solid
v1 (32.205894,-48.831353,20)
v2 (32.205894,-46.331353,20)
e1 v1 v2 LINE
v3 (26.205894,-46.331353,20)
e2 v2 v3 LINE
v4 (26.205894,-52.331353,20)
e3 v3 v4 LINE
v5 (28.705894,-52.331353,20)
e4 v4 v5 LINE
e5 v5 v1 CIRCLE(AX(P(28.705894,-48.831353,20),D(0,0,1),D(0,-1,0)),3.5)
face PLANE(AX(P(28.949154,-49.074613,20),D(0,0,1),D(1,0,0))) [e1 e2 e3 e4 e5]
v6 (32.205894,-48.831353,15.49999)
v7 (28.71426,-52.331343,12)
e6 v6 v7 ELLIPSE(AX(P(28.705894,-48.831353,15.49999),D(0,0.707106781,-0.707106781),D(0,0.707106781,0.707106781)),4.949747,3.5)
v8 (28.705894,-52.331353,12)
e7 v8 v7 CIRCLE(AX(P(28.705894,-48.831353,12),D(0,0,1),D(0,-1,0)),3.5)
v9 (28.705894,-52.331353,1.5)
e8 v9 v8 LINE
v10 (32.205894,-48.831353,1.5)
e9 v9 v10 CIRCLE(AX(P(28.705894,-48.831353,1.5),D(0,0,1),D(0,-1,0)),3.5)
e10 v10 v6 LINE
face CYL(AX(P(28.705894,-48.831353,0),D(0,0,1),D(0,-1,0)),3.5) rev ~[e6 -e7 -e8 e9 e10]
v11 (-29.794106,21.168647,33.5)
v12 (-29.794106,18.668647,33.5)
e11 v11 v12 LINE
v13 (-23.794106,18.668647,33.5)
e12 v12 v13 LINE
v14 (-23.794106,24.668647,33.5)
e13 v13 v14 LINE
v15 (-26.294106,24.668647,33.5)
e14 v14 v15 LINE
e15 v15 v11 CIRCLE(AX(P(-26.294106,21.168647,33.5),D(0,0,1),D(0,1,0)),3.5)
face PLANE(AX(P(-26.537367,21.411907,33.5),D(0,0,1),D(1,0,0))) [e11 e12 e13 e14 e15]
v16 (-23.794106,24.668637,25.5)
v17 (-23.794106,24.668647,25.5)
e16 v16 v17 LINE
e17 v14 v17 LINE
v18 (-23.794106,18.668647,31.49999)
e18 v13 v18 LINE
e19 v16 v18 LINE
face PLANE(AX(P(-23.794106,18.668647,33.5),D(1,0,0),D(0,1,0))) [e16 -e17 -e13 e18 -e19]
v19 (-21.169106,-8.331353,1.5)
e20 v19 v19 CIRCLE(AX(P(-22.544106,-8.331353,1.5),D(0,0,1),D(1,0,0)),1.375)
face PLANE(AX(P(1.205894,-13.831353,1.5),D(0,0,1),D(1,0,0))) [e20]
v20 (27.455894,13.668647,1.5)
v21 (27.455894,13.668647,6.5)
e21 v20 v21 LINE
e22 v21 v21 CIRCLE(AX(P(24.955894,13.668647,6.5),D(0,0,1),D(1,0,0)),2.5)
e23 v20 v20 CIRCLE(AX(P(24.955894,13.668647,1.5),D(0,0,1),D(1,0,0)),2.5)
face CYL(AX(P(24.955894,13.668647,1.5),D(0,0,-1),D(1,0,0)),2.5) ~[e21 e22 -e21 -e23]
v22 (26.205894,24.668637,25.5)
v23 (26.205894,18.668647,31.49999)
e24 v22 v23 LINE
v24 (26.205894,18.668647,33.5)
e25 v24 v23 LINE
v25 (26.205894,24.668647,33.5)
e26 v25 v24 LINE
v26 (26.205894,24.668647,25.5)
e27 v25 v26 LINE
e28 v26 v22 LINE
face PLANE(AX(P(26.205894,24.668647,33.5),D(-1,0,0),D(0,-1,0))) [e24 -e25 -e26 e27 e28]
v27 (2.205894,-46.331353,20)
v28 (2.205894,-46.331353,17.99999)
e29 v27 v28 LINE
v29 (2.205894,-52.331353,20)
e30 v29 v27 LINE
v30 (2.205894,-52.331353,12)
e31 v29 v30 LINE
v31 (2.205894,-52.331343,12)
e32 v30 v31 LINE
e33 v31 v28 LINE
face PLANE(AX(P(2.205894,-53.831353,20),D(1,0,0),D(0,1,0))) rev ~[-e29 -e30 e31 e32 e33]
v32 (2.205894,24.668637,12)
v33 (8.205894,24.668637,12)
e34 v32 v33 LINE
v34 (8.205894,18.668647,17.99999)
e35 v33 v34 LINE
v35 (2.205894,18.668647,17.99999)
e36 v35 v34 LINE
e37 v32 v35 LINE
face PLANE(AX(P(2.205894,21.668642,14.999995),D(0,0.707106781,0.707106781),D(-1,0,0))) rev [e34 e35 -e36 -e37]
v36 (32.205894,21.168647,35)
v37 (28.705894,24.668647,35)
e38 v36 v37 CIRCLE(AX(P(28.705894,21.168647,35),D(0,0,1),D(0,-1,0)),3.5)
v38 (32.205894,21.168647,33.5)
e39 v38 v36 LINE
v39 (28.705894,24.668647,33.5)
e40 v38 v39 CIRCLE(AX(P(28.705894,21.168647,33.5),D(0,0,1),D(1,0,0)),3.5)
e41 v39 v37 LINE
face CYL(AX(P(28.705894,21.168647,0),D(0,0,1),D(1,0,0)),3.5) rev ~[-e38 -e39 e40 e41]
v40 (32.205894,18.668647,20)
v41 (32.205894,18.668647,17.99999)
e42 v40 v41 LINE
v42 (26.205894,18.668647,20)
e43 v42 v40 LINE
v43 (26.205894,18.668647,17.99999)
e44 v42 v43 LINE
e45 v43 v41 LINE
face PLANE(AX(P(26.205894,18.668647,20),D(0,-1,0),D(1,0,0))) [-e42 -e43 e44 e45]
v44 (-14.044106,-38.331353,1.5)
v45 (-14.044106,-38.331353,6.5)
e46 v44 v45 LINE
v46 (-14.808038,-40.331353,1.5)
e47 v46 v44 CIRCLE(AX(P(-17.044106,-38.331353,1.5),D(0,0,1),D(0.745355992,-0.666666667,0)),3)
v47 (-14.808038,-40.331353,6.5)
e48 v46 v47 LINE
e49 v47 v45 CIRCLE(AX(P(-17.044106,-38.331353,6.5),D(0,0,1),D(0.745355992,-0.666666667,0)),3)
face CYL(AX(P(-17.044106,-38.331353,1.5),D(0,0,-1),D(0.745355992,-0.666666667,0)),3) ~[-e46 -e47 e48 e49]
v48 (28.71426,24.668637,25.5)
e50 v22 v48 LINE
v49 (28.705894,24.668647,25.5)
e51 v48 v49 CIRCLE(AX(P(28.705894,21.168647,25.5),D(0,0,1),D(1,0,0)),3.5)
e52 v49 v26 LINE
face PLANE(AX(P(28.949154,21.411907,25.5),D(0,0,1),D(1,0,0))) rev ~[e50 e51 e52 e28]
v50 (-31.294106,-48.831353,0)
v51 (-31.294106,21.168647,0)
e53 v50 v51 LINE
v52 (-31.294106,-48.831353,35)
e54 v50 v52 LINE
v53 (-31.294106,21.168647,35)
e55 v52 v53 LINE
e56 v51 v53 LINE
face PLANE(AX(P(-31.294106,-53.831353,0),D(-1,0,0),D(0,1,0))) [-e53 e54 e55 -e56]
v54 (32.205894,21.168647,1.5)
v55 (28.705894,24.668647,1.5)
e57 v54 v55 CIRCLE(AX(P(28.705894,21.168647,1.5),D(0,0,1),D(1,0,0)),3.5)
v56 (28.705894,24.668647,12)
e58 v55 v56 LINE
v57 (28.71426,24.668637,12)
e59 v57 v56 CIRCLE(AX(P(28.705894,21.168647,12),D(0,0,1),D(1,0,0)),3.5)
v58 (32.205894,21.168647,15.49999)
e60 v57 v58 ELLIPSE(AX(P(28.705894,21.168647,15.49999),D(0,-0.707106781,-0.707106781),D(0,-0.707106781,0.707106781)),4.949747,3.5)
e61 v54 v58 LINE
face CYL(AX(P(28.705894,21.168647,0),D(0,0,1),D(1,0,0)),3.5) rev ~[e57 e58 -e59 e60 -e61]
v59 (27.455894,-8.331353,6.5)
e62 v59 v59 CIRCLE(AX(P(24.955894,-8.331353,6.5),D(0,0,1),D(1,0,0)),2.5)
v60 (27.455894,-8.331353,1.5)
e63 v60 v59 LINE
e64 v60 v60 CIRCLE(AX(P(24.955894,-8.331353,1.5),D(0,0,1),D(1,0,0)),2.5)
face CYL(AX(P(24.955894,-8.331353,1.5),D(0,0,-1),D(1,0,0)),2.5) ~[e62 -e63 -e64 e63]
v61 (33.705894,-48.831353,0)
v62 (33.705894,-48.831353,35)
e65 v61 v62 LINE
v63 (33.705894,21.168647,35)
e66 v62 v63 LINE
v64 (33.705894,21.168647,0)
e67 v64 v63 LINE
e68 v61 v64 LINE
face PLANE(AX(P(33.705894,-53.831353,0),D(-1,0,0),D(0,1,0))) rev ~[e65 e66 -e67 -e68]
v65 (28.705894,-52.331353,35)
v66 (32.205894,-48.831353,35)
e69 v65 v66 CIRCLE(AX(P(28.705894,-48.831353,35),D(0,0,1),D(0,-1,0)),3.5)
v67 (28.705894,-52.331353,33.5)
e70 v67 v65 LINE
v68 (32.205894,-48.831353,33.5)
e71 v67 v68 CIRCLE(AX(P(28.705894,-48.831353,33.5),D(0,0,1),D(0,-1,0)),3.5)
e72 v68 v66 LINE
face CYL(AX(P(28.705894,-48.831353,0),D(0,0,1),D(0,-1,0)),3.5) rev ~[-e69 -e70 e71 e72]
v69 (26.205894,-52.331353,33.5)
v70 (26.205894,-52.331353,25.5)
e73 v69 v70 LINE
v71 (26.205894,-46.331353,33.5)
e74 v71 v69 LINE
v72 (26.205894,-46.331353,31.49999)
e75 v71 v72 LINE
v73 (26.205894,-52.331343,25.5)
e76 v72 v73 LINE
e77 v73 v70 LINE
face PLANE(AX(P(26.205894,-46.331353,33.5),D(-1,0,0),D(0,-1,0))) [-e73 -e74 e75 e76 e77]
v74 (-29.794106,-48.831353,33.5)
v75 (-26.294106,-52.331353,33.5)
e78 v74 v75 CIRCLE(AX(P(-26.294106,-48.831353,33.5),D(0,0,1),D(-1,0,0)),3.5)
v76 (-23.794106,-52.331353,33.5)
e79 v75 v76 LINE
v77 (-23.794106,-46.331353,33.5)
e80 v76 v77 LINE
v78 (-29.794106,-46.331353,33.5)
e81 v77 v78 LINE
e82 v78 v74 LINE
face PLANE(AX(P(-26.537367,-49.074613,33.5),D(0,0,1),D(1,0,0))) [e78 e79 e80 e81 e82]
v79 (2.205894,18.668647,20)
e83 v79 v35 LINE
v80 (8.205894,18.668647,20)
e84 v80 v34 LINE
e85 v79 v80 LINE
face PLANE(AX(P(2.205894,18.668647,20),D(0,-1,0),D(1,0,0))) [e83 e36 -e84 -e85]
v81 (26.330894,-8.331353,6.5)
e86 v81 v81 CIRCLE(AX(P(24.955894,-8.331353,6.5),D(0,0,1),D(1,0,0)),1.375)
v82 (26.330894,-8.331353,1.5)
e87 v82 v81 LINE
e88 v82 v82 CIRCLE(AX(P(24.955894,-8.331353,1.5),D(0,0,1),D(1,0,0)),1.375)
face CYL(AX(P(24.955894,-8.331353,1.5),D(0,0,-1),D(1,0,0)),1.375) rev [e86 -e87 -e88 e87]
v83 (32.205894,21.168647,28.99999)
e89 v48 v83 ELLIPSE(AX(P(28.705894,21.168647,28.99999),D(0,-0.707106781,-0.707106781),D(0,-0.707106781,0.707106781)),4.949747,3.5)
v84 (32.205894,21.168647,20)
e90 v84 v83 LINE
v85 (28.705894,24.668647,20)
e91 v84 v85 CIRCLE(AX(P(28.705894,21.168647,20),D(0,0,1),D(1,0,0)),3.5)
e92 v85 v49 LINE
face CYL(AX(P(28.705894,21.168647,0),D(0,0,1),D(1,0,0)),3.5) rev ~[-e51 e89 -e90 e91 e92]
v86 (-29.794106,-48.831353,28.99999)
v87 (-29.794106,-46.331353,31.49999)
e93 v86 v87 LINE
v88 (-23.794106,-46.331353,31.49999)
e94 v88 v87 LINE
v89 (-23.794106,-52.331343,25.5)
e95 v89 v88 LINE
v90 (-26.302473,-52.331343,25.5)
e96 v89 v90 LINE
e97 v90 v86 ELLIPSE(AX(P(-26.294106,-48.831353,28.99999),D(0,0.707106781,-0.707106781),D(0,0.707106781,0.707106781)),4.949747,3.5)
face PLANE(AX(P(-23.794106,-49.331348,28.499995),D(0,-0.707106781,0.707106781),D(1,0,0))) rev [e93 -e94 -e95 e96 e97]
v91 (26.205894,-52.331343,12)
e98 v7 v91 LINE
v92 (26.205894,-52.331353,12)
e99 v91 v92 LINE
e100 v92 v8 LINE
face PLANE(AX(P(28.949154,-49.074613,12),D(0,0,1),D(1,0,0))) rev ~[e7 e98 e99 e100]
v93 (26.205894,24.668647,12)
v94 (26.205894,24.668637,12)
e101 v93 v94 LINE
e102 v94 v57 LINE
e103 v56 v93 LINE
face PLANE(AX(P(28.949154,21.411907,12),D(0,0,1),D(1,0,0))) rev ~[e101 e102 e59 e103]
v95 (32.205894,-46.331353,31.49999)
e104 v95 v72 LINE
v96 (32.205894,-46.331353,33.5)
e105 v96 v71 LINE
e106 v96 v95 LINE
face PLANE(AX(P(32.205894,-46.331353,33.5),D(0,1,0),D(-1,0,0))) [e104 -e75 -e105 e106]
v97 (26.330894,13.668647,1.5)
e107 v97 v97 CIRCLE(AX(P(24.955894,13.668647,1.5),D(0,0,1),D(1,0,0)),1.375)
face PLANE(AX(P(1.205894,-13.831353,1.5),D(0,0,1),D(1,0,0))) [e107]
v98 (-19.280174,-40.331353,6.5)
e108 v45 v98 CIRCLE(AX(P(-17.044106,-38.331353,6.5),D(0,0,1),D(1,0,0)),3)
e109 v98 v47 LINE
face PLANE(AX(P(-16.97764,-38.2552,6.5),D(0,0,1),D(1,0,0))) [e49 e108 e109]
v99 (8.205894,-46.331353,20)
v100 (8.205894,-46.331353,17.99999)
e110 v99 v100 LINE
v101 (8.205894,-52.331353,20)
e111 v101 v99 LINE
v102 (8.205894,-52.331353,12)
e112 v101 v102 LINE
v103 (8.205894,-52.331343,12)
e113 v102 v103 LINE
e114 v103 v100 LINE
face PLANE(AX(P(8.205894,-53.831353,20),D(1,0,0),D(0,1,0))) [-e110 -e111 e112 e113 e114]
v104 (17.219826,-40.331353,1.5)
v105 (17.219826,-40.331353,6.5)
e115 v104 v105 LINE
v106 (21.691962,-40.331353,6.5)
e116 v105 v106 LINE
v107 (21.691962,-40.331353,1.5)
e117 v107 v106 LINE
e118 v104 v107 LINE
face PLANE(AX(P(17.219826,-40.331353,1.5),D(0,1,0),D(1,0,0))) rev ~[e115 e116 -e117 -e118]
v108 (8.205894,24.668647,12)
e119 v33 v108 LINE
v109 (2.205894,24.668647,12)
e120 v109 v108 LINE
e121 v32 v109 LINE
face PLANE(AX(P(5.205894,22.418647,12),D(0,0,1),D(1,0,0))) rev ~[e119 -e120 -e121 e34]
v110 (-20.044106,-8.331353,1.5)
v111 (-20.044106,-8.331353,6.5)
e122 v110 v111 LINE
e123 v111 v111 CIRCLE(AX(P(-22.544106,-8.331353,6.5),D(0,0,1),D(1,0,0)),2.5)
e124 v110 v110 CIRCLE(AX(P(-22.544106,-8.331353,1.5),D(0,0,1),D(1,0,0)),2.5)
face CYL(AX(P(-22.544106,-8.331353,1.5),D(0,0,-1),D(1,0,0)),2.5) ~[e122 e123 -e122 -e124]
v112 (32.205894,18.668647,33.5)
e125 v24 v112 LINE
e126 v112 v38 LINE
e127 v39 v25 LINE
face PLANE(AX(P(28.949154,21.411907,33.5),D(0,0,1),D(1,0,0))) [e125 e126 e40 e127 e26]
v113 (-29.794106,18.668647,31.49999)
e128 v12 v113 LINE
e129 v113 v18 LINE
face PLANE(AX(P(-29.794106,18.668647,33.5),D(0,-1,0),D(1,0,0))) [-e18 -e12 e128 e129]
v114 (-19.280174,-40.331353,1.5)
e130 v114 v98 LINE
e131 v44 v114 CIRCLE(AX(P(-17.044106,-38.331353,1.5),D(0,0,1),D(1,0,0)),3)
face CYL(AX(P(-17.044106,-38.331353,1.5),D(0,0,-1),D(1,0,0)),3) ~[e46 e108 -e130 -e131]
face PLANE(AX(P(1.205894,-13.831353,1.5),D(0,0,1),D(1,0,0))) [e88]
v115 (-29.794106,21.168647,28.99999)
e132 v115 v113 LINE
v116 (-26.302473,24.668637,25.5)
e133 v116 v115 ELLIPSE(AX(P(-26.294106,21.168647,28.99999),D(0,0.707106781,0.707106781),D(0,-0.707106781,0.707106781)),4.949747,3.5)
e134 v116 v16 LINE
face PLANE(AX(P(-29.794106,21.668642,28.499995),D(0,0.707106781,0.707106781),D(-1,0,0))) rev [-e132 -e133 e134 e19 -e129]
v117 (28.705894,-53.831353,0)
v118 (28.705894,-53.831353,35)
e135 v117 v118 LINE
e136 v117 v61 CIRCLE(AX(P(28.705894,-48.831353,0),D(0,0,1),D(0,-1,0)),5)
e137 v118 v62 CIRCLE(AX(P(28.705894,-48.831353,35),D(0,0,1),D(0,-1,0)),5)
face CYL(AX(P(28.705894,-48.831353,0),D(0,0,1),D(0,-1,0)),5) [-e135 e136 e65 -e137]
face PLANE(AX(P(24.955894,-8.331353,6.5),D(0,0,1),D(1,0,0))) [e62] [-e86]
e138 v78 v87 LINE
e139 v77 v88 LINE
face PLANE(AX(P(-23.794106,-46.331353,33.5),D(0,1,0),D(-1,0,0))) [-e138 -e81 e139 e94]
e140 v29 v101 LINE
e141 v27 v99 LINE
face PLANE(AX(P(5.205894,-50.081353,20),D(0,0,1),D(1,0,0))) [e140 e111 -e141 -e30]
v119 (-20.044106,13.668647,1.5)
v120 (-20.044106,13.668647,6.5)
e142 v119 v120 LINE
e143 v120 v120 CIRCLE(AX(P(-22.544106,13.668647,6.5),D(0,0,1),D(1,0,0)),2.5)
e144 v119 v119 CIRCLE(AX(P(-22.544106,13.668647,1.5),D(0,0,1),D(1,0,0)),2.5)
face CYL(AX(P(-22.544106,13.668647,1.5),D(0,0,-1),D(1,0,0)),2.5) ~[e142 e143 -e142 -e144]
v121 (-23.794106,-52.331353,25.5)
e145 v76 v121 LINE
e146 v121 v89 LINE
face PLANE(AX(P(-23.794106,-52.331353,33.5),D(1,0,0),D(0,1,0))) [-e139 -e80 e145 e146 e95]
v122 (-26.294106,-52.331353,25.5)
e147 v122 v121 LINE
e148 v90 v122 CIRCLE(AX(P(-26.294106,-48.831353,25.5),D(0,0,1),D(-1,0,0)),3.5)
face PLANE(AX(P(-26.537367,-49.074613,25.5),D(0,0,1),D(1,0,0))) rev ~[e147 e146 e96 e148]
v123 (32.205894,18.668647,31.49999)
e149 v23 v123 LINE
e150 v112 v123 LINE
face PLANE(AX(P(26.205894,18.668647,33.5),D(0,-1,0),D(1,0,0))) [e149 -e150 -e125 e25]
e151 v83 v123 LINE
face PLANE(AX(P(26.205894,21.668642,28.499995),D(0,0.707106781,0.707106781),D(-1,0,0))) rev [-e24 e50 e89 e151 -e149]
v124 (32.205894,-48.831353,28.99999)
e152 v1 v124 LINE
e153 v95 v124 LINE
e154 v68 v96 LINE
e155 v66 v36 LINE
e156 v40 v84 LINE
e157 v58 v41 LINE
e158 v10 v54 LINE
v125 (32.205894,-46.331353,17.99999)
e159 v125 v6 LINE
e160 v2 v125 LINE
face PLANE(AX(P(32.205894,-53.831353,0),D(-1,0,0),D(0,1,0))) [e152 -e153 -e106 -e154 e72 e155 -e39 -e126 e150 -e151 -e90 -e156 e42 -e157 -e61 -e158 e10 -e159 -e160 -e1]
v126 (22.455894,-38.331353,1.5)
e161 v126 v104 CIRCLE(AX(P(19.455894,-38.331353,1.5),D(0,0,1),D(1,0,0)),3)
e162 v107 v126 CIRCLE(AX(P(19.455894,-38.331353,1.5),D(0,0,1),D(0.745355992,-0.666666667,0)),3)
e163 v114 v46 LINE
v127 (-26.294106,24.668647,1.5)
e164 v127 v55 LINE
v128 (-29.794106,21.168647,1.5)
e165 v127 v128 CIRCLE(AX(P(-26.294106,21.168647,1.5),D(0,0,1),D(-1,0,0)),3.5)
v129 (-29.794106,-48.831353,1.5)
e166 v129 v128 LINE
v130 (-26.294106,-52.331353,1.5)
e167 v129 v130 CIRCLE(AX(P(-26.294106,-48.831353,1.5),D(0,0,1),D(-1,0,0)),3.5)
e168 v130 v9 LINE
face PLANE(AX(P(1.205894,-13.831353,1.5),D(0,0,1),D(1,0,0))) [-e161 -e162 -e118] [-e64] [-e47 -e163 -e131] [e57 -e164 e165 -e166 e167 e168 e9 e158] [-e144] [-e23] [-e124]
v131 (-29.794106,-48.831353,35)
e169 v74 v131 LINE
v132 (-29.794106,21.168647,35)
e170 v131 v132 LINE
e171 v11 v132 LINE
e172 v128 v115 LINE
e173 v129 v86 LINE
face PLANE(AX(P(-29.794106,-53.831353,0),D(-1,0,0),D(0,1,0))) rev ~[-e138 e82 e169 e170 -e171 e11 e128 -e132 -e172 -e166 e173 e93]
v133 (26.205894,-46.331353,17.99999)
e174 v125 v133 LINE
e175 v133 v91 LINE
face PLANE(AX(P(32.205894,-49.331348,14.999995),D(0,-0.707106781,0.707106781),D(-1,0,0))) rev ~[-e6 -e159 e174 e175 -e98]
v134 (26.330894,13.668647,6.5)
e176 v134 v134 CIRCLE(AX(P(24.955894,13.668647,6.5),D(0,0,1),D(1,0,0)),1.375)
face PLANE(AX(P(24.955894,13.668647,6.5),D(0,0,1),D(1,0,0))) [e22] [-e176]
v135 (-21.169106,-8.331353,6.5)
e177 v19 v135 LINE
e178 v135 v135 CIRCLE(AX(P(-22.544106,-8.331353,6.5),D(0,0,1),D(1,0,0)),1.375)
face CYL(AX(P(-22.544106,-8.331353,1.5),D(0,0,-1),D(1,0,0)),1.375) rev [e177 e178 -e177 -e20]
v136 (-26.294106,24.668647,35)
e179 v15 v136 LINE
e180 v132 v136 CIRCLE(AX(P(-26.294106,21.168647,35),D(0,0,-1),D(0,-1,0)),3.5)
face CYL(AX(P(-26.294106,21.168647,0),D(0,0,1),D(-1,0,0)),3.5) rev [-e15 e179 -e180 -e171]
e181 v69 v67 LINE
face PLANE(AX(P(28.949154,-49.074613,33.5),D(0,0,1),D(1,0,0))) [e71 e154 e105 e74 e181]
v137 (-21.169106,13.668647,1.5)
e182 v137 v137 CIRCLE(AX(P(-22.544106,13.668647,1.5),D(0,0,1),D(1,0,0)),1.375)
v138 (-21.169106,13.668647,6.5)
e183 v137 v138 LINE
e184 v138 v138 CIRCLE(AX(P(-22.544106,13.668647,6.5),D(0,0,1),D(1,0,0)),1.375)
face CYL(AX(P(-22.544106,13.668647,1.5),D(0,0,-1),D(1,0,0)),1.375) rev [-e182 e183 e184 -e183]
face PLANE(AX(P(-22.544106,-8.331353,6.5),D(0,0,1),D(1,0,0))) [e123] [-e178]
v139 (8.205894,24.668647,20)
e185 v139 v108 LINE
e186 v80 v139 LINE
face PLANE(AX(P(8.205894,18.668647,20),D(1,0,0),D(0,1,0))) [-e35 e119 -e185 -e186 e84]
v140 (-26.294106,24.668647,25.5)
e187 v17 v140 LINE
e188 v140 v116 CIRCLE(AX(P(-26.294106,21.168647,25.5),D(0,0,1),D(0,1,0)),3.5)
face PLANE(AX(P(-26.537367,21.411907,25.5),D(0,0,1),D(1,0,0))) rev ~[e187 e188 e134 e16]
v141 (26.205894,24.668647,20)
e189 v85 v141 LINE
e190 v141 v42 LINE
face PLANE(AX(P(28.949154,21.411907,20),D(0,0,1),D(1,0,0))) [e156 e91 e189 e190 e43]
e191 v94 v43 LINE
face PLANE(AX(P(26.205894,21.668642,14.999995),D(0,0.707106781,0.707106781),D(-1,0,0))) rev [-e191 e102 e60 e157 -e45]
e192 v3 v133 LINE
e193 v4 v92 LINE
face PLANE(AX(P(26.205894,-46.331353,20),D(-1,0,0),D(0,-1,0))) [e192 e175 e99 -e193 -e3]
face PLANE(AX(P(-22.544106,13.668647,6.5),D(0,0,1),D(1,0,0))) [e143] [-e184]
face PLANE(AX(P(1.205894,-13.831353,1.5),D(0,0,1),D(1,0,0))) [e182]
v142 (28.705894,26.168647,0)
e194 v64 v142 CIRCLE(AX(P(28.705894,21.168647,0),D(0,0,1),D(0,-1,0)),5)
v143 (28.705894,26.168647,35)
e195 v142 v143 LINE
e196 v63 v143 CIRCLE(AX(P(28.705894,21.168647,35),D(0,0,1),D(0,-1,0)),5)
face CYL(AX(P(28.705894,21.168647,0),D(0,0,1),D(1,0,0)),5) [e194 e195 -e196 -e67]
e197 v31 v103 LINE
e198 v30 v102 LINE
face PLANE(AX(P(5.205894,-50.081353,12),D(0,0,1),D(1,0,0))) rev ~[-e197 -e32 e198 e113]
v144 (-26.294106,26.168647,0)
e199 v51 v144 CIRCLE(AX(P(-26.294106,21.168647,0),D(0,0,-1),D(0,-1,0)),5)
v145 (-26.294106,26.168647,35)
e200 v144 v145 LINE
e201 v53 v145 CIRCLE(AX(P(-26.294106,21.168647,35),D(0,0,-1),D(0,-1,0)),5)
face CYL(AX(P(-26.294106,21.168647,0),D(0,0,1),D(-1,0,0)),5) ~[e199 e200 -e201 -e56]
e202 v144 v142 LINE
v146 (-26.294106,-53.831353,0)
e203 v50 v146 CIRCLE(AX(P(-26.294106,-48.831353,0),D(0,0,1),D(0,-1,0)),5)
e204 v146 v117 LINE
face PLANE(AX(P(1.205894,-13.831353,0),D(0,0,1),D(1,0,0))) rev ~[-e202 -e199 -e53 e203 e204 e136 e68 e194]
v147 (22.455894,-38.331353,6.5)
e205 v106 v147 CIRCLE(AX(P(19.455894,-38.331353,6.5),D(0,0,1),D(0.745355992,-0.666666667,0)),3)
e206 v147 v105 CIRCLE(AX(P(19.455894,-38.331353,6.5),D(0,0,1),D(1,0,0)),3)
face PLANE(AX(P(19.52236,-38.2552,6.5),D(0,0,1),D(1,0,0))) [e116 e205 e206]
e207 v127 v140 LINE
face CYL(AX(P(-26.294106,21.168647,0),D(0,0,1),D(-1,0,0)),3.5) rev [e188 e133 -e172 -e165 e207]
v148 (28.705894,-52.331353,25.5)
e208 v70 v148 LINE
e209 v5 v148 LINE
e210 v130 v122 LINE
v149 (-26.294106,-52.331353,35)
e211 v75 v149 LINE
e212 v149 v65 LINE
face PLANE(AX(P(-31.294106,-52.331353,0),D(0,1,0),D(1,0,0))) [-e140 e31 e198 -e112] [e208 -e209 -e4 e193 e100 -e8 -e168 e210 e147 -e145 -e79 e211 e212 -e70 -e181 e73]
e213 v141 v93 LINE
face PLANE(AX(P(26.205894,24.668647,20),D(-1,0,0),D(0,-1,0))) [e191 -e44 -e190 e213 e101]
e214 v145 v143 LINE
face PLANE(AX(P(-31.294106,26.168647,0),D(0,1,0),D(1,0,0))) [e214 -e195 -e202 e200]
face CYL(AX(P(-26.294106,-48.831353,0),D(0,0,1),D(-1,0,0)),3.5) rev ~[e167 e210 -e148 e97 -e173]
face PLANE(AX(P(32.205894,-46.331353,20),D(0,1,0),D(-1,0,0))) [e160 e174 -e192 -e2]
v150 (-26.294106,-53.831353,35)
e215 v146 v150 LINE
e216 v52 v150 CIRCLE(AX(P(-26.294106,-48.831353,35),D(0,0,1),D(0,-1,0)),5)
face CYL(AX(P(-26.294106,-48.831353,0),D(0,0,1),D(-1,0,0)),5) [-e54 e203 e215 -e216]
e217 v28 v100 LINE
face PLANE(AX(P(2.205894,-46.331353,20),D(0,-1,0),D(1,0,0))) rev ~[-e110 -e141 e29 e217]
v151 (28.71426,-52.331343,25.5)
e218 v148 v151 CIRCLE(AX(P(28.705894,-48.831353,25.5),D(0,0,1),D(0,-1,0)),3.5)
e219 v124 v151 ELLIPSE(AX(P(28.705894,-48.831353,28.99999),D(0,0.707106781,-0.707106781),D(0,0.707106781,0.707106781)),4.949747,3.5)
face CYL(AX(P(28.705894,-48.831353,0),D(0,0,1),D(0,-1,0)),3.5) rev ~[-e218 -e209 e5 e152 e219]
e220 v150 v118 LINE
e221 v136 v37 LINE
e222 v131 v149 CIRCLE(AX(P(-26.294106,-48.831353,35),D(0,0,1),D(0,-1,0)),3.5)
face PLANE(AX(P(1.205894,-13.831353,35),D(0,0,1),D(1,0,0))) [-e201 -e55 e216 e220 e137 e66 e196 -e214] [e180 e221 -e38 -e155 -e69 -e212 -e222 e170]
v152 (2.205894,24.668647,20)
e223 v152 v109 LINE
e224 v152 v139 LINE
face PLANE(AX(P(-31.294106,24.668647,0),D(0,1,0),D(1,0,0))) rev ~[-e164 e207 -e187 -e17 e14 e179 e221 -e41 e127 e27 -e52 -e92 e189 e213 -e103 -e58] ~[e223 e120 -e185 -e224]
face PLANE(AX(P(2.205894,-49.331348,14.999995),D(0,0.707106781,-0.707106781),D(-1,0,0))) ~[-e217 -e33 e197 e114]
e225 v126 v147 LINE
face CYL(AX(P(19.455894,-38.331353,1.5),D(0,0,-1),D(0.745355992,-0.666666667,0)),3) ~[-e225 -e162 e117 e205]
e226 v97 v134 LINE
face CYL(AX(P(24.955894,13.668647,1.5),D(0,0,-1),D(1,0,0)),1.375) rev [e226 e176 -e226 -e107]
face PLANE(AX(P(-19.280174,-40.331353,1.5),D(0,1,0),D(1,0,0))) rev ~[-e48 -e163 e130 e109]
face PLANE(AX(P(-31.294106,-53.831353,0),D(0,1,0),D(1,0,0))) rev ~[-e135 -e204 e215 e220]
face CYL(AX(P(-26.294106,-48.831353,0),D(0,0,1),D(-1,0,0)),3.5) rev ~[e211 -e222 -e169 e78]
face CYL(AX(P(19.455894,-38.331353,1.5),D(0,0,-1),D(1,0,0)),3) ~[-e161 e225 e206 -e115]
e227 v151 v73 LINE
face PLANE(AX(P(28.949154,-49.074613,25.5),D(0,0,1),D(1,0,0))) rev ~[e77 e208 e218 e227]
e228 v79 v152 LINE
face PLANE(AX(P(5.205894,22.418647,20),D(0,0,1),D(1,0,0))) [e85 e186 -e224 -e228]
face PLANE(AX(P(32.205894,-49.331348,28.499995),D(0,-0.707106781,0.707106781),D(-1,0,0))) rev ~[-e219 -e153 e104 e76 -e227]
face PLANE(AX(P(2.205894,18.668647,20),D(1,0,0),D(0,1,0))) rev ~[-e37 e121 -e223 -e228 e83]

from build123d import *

# Parameters (mm, degrees)
F0_W      = 65
F0_H      = 80
F1_DEPTH  = 35
F2_R      = 5
F3_T      = -1.5
F6_DEPTH  = 8
F7_R      = 2.5
F7_R_2    = 1.375
F9_DEPTH  = 5
F10_W     = 6
F10_H     = 7.5
F11_DEPTH = 8
F12_SIZE  = 5.99999


# Not quite as in the source:
# - a fillet or chamfer is up to 0.001 mm smaller than in the source, because OpenCascade refuses the exact size


with BuildPart() as f1:
    # F0 (on Top) → F1 (new body)
    with BuildSketch(Plane.XY):
        with Locations((1.2058935761, -13.8313528726)):
            Rectangle(F0_W, F0_H)
    extrude(amount=F1_DEPTH)

    # F2
    f2_edges = [f1.edges().sort_by_distance(p)[0] for p in [
        (-31.294106, -53.831353, 17.5),
        (-31.294106, 26.168647, 17.5),
        (33.705894, -53.831353, 17.5),
        (33.705894, 26.168647, 17.5),
    ]]
    fillet(f2_edges, radius=F2_R)

    # F3
    f3_openings = [f1.faces().sort_by_distance(p)[0] for p in [
        (1.205894, -13.831353, 35),
    ]]
    offset(amount=F3_T, openings=f3_openings)

    # F5 (on offset) → F6 (join)
    with BuildSketch(Plane.XY.offset(33.5)):
        with BuildLine():
            Line((-29.7941064239, 18.6686471274), (-23.7941064239, 18.6686471274))
            Line((-23.7941064239, 18.6686471274), (-23.7941064239, 24.6686471274))
            Line((-23.7941064239, 24.6686471274), (-26.2941064239, 24.6686471274))
            ThreePointArc((-26.2941064239, 24.6686471274), (-28.768980158, 23.6435208615), (-29.7941064239, 21.1686471274))
            Line((-29.7941064239, 21.1686471274), (-29.7941064239, 18.6686471274))
        make_face()
        with BuildLine():
            Line((28.7058935761, 24.6686471274), (26.2058935761, 24.6686471274))
            Line((26.2058935761, 24.6686471274), (26.2058935761, 18.6686471274))
            Line((26.2058935761, 18.6686471274), (32.2058935761, 18.6686471274))
            Line((32.2058935761, 18.6686471274), (32.2058935761, 21.1686471274))
            ThreePointArc((32.2058935761, 21.1686471274), (31.1807673103, 23.6435208615), (28.7058935761, 24.6686471274))
        make_face()
        with BuildLine():
            Line((26.2058935761, -46.3313528726), (26.2058935761, -52.3313528726))
            Line((26.2058935761, -52.3313528726), (28.7058935761, -52.3313528726))
            ThreePointArc((28.7058935761, -52.3313528726), (31.1807673103, -51.3062266068), (32.2058935761, -48.8313528726))
            Line((32.2058935761, -48.8313528726), (32.2058935761, -46.3313528726))
            Line((32.2058935761, -46.3313528726), (26.2058935761, -46.3313528726))
        make_face()
        with BuildLine():
            Line((-23.7941064239, -46.3313528726), (-29.7941064239, -46.3313528726))
            Line((-29.7941064239, -46.3313528726), (-29.7941064239, -48.8313528726))
            ThreePointArc((-29.7941064239, -48.8313528726), (-28.768980158, -51.3062266068), (-26.2941064239, -52.3313528726))
            Line((-26.2941064239, -52.3313528726), (-23.7941064239, -52.3313528726))
            Line((-23.7941064239, -52.3313528726), (-23.7941064239, -46.3313528726))
        make_face()
    extrude(amount=-F6_DEPTH)

    # F7 (on face) → F9 (join)
    with BuildSketch(Plane.XY.offset(1.5)):
        with Locations((-22.5441064239, 13.6686471274)):
            Circle(F7_R)
        with Locations((-22.5441064239, 13.6686471274)):
            Circle(F7_R_2, mode=Mode.SUBTRACT)
        with Locations((-22.5441064239, -8.3313528726)):
            Circle(F7_R)
        with Locations((-22.5441064239, -8.3313528726)):
            Circle(F7_R_2, mode=Mode.SUBTRACT)
        with Locations((24.9558935761, 13.6686471274)):
            Circle(F7_R)
        with Locations((24.9558935761, 13.6686471274)):
            Circle(F7_R_2, mode=Mode.SUBTRACT)
        with Locations((24.9558935761, -8.3313528726)):
            Circle(F7_R)
        with Locations((24.9558935761, -8.3313528726)):
            Circle(F7_R_2, mode=Mode.SUBTRACT)
        with BuildLine():
            Line((17.2198255986, -40.3313528726), (21.6919615536, -40.3313528726))
            ThreePointArc((21.6919615536, -40.3313528726), (22.258410653, -39.4018191419), (22.4558935761, -38.3313528726))
            ThreePointArc((22.4558935761, -38.3313528726), (18.3854273068, -35.5288357957), (17.2198255986, -40.3313528726))
        make_face()
        with BuildLine():
            ThreePointArc((-14.0441064239, -38.3313528726), (-18.1145726932, -35.5288357957), (-19.2801744014, -40.3313528726))
            Line((-19.2801744014, -40.3313528726), (-14.8080384464, -40.3313528726))
            ThreePointArc((-14.8080384464, -40.3313528726), (-14.241589347, -39.4018191419), (-14.0441064239, -38.3313528726))
        make_face()
    extrude(amount=F9_DEPTH)

    # F10 (on offset) → F11 (join)
    with BuildSketch(Plane.XY.offset(20)):
        with Locations((5.2058935761, 22.4186471274)):
            Rectangle(F10_W, F10_H)
        with BuildLine():
            Line((26.2058935761, 18.6686471274), (32.2058935761, 18.6686471274))
            Line((32.2058935761, 18.6686471274), (32.2058935761, 21.1686471274))
            ThreePointArc((32.2058935761, 21.1686471274), (31.1807673103, 23.6435208615), (28.7058935761, 24.6686471274))
            Line((28.7058935761, 24.6686471274), (26.2058935761, 24.6686471274))
            Line((26.2058935761, 24.6686471274), (26.2058935761, 18.6686471274))
        make_face()
        with BuildLine():
            Line((32.2058935761, -46.3313528726), (26.2058935761, -46.3313528726))
            Line((26.2058935761, -46.3313528726), (26.2058935761, -52.3313528726))
            Line((26.2058935761, -52.3313528726), (28.7058935761, -52.3313528726))
            ThreePointArc((28.7058935761, -52.3313528726), (31.1807673103, -51.3062266068), (32.2058935761, -48.8313528726))
            Line((32.2058935761, -48.8313528726), (32.2058935761, -46.3313528726))
        make_face()
        with Locations((5.2058935761, -50.0813528726)):
            Rectangle(F10_W, F10_H)
    extrude(amount=-F11_DEPTH)

    # F12 (size 6 in the source; OpenCascade refuses exactly that, so slightly less here)
    f12_edges = [f1.edges().sort_by_distance(p)[0] for p in [
        (29.205894, -46.331353, 25.5),
        (29.205894, -46.331353, 12),
        (5.205894, -46.331353, 12),
        (29.205894, 18.668647, 12),
        (29.205894, 18.668647, 25.5),
        (5.205894, 18.668647, 12),
        (-26.794106, 18.668647, 25.5),
        (-26.794106, -46.331353, 25.5),
    ]]
    chamfer(f12_edges, length=F12_SIZE)


solid = f1.part
